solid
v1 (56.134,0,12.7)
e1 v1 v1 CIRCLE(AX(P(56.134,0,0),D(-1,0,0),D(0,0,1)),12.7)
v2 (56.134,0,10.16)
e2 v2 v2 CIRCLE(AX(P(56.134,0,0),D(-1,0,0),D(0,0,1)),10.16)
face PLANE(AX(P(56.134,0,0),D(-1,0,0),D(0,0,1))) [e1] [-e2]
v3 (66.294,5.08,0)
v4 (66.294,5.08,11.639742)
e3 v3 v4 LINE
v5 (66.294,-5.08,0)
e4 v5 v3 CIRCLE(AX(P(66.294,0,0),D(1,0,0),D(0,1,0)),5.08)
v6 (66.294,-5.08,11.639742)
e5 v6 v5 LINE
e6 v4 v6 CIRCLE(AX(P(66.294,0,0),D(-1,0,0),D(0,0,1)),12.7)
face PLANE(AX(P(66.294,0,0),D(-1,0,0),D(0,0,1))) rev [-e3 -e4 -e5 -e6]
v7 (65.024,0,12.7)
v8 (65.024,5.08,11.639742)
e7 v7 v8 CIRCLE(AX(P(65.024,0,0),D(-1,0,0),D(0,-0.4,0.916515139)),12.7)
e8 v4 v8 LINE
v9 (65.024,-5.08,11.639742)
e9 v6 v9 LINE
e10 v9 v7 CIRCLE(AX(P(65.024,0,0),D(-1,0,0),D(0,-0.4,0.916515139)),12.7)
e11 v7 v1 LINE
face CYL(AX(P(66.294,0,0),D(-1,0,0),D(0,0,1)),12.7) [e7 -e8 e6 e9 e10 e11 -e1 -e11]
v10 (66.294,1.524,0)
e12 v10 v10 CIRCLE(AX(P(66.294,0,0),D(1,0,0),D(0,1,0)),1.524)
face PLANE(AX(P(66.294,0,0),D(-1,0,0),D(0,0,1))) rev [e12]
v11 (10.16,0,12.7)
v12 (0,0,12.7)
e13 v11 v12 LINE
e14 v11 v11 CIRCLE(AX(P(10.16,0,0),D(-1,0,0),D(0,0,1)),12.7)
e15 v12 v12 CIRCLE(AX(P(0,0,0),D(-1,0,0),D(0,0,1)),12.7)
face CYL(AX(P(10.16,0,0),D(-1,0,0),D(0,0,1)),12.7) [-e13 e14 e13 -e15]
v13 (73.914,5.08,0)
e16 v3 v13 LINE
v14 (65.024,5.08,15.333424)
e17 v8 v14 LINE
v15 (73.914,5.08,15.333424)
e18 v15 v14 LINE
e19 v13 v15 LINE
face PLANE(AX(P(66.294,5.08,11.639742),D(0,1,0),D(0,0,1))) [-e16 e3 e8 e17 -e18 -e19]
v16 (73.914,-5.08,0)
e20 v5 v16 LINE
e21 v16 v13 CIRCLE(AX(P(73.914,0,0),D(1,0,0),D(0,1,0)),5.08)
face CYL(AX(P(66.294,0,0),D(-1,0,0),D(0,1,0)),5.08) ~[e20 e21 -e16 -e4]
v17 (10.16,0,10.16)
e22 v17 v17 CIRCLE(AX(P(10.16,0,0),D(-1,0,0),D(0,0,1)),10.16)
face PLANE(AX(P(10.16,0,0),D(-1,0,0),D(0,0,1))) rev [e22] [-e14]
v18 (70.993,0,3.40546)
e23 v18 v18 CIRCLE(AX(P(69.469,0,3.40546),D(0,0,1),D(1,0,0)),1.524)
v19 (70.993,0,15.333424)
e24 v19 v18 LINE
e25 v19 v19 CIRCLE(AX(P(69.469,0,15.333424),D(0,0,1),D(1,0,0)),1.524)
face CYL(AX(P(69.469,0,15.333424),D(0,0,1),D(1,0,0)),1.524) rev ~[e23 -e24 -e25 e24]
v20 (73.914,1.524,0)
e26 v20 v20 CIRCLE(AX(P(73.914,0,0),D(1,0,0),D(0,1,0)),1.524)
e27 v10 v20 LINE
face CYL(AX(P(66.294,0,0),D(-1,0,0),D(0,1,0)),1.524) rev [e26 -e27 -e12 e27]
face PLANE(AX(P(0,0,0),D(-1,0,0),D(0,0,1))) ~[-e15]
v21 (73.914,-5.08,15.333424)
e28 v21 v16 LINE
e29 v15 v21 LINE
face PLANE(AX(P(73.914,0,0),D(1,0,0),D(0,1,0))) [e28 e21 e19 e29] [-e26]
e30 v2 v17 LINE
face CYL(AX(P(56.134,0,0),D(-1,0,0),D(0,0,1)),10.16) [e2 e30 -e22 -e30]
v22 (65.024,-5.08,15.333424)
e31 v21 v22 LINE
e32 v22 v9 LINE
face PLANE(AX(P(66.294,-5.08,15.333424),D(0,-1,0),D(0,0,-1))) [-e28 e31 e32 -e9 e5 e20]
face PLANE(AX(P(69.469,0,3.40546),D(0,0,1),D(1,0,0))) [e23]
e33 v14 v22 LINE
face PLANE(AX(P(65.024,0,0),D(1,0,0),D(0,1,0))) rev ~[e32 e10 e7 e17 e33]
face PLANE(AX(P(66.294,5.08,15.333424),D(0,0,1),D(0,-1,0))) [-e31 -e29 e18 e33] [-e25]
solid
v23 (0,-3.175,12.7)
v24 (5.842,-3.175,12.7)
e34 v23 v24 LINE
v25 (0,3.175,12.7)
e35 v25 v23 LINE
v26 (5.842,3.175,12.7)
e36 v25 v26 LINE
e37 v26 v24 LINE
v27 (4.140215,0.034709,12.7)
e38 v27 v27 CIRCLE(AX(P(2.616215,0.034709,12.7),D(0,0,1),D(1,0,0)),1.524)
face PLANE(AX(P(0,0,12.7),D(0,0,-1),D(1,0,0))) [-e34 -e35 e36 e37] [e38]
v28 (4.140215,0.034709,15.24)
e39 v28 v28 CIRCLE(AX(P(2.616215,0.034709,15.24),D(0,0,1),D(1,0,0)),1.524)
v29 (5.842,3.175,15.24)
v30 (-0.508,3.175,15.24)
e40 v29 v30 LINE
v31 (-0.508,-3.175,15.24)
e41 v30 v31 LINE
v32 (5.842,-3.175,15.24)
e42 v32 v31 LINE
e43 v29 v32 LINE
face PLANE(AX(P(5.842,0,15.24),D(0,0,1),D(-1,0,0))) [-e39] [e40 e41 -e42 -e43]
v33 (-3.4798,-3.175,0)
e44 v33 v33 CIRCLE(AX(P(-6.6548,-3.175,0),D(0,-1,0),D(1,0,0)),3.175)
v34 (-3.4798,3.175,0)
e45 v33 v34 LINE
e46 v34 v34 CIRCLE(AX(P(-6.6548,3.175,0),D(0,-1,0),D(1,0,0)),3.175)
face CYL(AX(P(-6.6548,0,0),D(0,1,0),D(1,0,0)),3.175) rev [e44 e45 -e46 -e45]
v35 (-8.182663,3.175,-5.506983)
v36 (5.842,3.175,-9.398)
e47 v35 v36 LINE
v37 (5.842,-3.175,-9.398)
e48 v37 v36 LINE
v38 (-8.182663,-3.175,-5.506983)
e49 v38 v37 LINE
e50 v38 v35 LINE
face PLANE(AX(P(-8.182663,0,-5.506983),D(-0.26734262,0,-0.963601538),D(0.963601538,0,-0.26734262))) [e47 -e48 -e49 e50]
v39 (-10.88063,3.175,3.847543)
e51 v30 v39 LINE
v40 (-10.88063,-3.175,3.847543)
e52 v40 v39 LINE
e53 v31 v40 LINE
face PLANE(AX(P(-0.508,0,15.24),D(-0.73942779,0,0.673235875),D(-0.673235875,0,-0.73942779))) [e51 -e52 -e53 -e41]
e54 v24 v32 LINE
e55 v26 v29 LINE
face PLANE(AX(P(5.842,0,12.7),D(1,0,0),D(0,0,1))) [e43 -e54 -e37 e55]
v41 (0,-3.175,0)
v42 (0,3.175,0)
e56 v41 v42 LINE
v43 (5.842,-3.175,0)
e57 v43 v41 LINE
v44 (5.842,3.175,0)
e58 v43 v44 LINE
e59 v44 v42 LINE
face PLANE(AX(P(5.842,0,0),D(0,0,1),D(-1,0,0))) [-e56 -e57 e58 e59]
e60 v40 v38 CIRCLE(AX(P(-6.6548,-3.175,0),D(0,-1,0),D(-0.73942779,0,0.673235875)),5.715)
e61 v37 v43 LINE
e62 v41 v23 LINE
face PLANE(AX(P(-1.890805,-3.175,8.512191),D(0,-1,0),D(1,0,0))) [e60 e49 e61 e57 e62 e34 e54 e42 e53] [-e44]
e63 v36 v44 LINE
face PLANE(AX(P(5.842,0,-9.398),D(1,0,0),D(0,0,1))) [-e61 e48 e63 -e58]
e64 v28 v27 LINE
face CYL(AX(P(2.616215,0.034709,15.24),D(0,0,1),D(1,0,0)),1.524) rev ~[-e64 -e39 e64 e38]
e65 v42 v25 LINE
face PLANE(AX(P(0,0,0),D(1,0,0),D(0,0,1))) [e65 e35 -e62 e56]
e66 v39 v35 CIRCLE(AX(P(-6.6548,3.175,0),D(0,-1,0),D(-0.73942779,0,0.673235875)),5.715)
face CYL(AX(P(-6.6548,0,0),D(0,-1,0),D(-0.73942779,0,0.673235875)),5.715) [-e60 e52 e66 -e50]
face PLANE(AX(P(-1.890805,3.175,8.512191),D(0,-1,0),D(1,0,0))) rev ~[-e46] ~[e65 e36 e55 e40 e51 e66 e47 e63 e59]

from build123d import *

# Parameters (mm, degrees)
F0_W      = 5.842
F0_H      = 12.7
F0_R      = 3.175
F3_DEPTH  = 3.175
F4_R      = 1.524
F5_DEPTH  = 7.62
F6_DEPTH  = 1.27
F8_R      = 1.524
F9_DEPTH  = 10.414
F10_DEPTH = 11.9279641658
F7_R      = 1.524
F11_DEPTH = 9.9806375802


with BuildPart() as f2:
    # F0 (on Front) → F2 (revolve)
    with BuildSketch(Plane.XZ):
        Polygon((5.842, 12.7), (5.842, 0), (66.294, 0), (66.294, 12.7), (56.134, 12.7), (56.134, 10.16), (10.16, 10.16), (10.16, 12.7), align=None)
        with Locations((2.921, 6.35)):
            Rectangle(F0_W, F0_H)
    revolve(axis=Axis((33.147, 0, 0), (-1, 0, 0)))

    # F4 (on face) → F5 (join)
    with BuildSketch(Plane.YZ.offset(66.294)):
        with BuildLine():
            ThreePointArc((-5.08, 0), (0, -5.08), (5.08, 0))
            ThreePointArc((5.08, 0), (0, 5.08), (-5.08, 0))
        make_face()
        Circle(F4_R, mode=Mode.SUBTRACT)
        with BuildLine():
            ThreePointArc((-5.08, 0), (0, 5.08), (5.08, 0))
            Line((5.08, 0), (5.08, 15.3334243223))
            Line((5.08, 15.3334243223), (-5.08, 15.3334243223))
            Line((-5.08, 15.3334243223), (-5.08, 0))
        make_face()
    extrude(amount=F5_DEPTH)

    # F6 (add): a face of the model
    f6_faces = [f2.faces().sort_by_distance(p)[0] for p in [
        (66.294, 0, 13.8265158547),
    ]]
    extrude(f6_faces, amount=F6_DEPTH)

    # F8 (on face) → F9 (join)
    with BuildSketch(Plane.XY.offset(15.3334243223)):
        with Locations((69.469, 0)):
            Circle(F8_R)
    extrude(amount=-F9_DEPTH)

    # F8 (on face) → F10 (cut)
    with BuildSketch(Plane.XY.offset(15.3334243223)):
        with Locations((69.469, 0)):
            Circle(F8_R)
    extrude(amount=-F10_DEPTH, mode=Mode.SUBTRACT)


with BuildPart() as f3:
    # F0 (on Front) → F3 (new body, symmetric)
    with BuildSketch(Plane.XZ):
        with BuildLine():
            Line((-0.9398, 0), (0, 0))
            Line((0, 0), (0, 12.7))
            Line((0, 12.7), (5.842, 12.7))
            Line((5.842, 12.7), (5.842, 15.24))
            Line((5.842, 15.24), (-0.508, 15.24))
            Line((-0.508, 15.24), (-10.8806298187, 3.8475430269))
            ThreePointArc((-10.8806298187, 3.8475430269), (-4.5919612295, 5.3297205562), (-0.9398, 0))
        make_face()
        with BuildLine():
            Line((5.842, 0), (0, 0))
            Line((0, 0), (-0.9398, 0))
            ThreePointArc((-0.9398, 0), (-3.1957909266, -4.5493385486), (-8.1826630726, -5.5069827884))
            Line((-8.1826630726, -5.5069827884), (5.842, -9.398))
            Line((5.842, -9.398), (5.842, 0))
        make_face()
        with BuildLine():
            ThreePointArc((-8.1826630726, -5.5069827884), (-3.1957909266, -4.5493385486), (-0.9398, 0))
            ThreePointArc((-0.9398, 0), (-4.5919612295, 5.3297205562), (-10.8806298187, 3.8475430269))
            ThreePointArc((-10.8806298187, 3.8475430269), (-12.1459778134, -1.5837270034), (-8.1826630726, -5.5069827884))
        make_face()
        with Locations((-6.6548, 0)):
            Circle(F0_R, mode=Mode.SUBTRACT)
    extrude(amount=F3_DEPTH, both=True)

    # F7 (on face) → F11 (cut)
    with BuildSketch(Plane.XY.offset(15.24)):
        with Locations((2.6162154973, 0.0347092391)):
            Circle(F7_R)
    extrude(amount=-F11_DEPTH, mode=Mode.SUBTRACT)


solid = Compound([f2.part, f3.part])
